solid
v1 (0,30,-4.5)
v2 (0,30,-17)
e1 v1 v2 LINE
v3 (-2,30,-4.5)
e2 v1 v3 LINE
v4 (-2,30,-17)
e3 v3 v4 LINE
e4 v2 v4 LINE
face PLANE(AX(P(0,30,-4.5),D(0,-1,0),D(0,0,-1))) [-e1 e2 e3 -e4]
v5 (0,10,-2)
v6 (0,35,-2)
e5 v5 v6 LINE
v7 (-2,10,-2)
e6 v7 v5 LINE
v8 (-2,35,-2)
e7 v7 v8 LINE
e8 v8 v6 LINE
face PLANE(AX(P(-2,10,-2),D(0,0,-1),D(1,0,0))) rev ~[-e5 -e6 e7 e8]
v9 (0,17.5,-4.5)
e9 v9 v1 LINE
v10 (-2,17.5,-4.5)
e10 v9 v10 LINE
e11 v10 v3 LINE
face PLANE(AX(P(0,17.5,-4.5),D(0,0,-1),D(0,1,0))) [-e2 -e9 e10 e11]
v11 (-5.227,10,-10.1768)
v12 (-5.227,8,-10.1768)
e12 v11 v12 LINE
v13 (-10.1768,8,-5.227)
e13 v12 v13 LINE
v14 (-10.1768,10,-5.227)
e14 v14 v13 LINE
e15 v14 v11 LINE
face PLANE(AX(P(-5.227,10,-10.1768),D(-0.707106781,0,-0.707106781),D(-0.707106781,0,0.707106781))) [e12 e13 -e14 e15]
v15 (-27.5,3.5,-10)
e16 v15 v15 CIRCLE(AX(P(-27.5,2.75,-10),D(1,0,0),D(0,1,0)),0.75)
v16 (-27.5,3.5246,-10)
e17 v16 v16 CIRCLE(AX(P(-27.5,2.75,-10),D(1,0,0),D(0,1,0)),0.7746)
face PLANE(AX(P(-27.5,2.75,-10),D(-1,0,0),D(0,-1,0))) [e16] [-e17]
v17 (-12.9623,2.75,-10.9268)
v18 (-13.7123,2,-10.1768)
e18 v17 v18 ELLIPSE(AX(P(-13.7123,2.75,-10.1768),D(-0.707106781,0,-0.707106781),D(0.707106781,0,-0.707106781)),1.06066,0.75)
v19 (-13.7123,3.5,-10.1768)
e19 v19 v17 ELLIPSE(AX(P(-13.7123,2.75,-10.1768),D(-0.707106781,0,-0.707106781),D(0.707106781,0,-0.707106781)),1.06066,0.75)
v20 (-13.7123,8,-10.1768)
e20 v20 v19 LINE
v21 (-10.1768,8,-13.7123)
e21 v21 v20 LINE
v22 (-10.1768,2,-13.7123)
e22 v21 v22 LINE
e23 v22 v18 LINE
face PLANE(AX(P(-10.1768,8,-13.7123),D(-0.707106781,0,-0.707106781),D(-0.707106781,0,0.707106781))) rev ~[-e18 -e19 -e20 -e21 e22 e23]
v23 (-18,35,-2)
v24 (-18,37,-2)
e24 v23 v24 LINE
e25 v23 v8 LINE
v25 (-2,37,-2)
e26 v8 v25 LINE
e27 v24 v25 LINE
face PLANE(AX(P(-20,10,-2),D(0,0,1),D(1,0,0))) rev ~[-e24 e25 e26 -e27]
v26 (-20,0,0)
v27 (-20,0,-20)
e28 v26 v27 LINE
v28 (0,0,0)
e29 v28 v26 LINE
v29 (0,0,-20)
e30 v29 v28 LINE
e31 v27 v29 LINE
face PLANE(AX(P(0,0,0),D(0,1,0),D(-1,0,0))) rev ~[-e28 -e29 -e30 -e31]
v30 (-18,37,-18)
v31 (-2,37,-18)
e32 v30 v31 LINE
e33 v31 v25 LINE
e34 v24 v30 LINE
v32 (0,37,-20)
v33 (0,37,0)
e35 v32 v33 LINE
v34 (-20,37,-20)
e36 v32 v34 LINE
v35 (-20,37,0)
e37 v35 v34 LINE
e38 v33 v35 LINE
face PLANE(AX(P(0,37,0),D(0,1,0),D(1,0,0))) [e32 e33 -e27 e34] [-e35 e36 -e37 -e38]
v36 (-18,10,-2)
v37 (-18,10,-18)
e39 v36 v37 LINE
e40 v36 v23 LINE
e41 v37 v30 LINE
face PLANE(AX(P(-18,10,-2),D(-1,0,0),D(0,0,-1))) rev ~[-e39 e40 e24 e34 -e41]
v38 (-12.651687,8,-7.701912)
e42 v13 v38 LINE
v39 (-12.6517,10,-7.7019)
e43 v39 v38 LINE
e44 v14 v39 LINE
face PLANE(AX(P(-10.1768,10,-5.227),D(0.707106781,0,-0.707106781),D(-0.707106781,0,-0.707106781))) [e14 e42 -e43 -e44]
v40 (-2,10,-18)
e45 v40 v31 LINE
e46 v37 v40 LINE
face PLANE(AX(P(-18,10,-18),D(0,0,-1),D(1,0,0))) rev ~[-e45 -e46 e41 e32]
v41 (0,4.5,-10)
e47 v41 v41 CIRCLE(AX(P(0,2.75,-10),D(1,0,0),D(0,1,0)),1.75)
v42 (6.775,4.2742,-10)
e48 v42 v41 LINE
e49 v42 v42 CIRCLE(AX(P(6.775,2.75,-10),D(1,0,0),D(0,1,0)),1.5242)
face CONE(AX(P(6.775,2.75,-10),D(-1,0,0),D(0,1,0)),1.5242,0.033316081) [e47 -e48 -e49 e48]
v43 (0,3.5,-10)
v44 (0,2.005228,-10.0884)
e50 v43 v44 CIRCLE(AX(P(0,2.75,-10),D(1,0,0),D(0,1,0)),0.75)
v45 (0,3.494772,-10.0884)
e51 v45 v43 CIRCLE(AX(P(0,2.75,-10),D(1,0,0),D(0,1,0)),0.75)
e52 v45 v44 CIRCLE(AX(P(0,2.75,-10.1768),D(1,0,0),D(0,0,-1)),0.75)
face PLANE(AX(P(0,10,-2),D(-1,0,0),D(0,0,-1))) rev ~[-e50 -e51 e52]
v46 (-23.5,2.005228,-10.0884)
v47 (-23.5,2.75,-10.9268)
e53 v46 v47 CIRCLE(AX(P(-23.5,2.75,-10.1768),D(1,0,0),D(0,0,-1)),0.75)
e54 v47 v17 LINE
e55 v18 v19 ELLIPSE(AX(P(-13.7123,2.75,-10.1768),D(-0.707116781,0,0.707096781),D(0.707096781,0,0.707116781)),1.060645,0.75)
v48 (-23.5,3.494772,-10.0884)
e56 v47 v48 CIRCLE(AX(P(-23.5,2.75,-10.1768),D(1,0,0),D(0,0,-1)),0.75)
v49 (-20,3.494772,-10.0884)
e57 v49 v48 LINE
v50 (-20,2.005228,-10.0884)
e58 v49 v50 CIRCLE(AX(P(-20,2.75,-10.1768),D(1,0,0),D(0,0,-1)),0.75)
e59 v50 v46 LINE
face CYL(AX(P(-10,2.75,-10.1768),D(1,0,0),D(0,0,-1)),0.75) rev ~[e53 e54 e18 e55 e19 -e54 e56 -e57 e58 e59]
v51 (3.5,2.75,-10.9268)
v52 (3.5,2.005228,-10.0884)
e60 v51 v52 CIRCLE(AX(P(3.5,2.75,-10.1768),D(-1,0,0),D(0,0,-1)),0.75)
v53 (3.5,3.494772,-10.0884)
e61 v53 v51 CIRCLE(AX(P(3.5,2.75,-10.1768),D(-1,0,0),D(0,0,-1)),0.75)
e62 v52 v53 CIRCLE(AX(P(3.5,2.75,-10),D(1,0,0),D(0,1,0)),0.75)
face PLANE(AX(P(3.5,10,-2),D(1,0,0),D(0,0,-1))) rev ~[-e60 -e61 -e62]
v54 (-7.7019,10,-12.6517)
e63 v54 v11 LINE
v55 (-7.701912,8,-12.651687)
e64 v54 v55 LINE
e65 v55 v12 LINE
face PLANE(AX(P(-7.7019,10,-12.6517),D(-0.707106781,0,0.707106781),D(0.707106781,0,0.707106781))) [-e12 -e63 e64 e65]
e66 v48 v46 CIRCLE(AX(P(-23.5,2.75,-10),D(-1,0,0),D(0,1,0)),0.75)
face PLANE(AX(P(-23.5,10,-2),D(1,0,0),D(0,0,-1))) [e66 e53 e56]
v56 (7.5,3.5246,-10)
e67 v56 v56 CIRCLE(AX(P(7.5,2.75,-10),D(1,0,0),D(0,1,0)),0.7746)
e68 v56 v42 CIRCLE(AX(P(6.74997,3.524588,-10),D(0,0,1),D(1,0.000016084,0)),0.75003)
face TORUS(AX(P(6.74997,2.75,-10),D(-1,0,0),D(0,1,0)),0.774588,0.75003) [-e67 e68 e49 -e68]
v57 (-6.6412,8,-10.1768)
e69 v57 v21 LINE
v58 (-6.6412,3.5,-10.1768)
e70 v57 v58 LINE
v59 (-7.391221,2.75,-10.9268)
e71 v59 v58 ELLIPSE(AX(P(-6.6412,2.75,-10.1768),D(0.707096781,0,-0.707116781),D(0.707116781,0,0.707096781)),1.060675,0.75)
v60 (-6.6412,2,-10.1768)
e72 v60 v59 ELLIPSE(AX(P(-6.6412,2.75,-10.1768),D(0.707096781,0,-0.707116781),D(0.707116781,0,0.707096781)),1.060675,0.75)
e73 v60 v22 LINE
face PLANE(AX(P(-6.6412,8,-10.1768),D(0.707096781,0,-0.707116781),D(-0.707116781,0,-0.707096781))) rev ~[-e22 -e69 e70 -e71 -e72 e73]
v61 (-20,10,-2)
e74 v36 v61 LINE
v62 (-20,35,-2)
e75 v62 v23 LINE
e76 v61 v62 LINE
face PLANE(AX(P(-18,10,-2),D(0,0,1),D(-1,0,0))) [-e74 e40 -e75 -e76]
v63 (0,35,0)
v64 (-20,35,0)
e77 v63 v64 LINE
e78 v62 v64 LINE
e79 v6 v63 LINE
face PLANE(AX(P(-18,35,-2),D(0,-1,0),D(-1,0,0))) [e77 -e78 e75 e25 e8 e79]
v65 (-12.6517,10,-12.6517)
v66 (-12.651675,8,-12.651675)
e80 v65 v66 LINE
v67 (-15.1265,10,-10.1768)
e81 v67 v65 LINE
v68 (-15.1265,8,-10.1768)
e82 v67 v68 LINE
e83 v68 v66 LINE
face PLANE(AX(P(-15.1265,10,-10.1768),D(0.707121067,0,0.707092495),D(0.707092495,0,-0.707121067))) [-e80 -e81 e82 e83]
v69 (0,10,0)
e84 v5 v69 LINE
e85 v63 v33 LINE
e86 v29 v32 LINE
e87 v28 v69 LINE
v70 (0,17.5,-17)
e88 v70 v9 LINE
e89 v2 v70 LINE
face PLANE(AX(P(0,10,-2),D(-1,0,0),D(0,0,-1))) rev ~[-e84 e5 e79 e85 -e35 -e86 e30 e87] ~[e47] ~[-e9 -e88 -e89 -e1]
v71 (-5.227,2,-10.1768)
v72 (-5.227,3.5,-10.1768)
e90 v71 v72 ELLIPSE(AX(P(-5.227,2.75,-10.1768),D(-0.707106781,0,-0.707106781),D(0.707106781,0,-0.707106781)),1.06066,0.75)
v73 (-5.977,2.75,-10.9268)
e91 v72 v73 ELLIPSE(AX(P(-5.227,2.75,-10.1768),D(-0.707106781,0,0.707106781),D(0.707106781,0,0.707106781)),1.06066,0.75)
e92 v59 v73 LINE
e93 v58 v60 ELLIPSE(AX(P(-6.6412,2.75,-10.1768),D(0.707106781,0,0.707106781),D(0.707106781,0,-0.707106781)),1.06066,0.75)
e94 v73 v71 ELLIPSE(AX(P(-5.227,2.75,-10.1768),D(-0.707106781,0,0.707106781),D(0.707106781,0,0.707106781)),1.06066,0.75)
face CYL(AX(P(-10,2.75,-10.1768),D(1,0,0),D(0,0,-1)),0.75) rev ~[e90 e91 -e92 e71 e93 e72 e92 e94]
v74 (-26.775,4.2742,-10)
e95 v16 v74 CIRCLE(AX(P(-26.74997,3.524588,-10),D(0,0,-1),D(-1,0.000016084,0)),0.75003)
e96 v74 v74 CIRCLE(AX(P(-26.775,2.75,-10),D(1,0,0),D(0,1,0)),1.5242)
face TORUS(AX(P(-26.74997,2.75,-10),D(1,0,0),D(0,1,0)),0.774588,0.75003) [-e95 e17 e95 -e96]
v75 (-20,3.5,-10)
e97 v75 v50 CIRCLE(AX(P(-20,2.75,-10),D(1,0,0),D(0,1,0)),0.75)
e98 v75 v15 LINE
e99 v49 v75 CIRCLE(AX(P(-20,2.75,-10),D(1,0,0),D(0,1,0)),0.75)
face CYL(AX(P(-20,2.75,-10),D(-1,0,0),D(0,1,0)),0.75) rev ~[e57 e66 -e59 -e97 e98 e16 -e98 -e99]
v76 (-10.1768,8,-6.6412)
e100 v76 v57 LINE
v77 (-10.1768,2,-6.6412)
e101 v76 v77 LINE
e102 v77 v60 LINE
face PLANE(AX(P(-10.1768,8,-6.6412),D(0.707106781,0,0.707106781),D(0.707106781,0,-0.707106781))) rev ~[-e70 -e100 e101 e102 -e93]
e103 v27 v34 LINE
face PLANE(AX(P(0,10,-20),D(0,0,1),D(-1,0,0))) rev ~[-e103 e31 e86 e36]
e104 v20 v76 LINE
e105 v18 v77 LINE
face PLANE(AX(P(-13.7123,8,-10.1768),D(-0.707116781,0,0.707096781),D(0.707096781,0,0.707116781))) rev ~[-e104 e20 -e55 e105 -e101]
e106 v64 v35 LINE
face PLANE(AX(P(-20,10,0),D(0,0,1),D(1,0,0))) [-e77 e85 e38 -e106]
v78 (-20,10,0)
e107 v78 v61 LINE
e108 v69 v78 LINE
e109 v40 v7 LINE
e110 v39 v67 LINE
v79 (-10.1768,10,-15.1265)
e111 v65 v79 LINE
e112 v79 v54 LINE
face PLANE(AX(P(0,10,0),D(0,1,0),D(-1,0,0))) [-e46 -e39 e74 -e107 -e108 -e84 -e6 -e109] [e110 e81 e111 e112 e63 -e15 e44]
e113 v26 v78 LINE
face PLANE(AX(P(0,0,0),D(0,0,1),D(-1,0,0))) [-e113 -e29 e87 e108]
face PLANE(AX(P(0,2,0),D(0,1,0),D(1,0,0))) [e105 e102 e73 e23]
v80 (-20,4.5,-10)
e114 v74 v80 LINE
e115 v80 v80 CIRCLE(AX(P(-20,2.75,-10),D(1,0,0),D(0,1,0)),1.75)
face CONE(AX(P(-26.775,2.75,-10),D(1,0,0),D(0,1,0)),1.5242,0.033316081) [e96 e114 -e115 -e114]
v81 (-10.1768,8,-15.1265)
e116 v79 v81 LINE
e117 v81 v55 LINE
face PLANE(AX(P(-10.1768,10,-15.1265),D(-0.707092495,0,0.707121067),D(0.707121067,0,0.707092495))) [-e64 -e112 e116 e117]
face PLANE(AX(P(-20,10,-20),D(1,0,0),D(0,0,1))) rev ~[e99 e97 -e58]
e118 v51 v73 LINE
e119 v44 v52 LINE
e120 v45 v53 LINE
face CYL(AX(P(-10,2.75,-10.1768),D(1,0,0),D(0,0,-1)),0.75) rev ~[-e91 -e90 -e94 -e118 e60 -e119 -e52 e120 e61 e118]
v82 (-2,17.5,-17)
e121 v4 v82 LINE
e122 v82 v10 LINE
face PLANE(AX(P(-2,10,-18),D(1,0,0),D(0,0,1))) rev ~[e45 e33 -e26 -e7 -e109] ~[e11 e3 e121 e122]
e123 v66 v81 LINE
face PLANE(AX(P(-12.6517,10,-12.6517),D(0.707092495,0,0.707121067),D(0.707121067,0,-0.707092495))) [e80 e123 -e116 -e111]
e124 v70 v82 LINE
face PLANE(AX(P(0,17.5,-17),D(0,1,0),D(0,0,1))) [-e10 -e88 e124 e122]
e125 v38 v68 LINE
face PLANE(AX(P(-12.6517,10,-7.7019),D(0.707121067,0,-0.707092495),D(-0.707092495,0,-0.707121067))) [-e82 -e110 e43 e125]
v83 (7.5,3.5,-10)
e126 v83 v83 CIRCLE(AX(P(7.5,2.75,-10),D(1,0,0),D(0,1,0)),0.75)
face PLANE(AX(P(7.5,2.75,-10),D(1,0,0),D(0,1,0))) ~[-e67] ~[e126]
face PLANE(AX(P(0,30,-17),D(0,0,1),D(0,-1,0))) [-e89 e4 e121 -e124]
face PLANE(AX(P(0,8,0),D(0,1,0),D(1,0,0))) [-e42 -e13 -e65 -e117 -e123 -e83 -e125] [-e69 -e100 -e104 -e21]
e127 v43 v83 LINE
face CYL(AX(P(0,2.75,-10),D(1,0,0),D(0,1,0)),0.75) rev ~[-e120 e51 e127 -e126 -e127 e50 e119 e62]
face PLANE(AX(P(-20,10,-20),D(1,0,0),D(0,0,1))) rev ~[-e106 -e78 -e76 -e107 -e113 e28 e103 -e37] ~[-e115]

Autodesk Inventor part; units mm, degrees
ref_plane "YZ Plane" through (0, 0, 0) normal (1, 0, 0) x (0, 1, 0)
sketch "Sketch1" plane through (0, 0, 0) normal (0, 1, 0) x (-1, 0, 0)
  line L0 (0, 0) -> (20, 0)
  line L1 (20, 0) -> (20, -20)
  line L2 (20, -20) -> (0, -20)
  line L3 (0, -20) -> (0, 0)
  dimension "d0" = 20
  dimension "d1" = 20
extrude "Extrusion1" add sketch "Sketch1" along normal blind 10
sketch "Sketch4" plane through (0, 10, 0) normal (0, 1, 0) x (1, 0, 0)
  line L0 (0, 20) -> (-20, 20) projected
  line L1 (-20, 20) -> (-20, 0) projected
  line L2 (-20, 0) -> (0, 0) projected
  line L3 (0, 0) -> (0, 20) projected
  line L4 (0, 20) -> (-20, 20) projected
  line L5 (-20, 20) -> (0, 0)
  line L6 (-10.1768, 10.1768) -> (-7.7019, 12.6517)
  line L7 (-7.7019, 12.6517) -> (-5.227, 10.1768)
  line L8 (-5.227, 10.1768) -> (-7.7019, 7.7019)
  line L9 (-7.7019, 7.7019) -> (-10.1768, 10.1768)
  line L10 (-10.1768, 10.1768) -> (-12.6517, 7.7019)
  line L11 (-12.6517, 7.7019) -> (-15.1265, 10.1768)
  line L12 (-15.1265, 10.1768) -> (-12.6517, 12.6517)
  line L13 (-12.6517, 12.6517) -> (-10.1768, 10.1768)
  line L14 (-12.6517, 12.6517) -> (-10.1768, 15.1265)
  line L15 (-10.1768, 15.1265) -> (-7.7019, 12.6517)
  line L16 (-7.7019, 12.6517) -> (-10.1768, 10.1768)
  line L17 (-10.1768, 10.1768) -> (-12.6517, 12.6517)
  line L18 (-12.6517, 7.7019) -> (-10.1768, 10.1768)
  line L19 (-10.1768, 10.1768) -> (-7.7019, 7.7019)
  line L20 (-7.7019, 7.7019) -> (-10.1768, 5.227)
  line L21 (-10.1768, 5.227) -> (-12.6517, 7.7019)
  dimension "d10" = 3.5
  dimension "d11" = 3.5
  dimension "d12" = 3.5
  dimension "d13" = 3.5
extrude "Extrusion3" cut sketch "Sketch4" against normal blind 8 contours L14 L15 L6 L5 | L5 L10 L11 L12 | L20 L21 L10 L5 | L5 L6 L7 L8
sketch "Sketch5" plane through (0, 10, 0) normal (0, 1, 0) x (1, 0, 0)
  line L0 (-5.227, 10.1768) -> (-10.1768, 5.227) projected
  line L1 (-10.1768, 5.227) -> (-15.1265, 10.1768) projected
  line L2 (-15.1265, 10.1768) -> (-10.1768, 15.1265) projected
  line L3 (-10.1768, 15.1265) -> (-5.227, 10.1768) projected
  line L4 (0, 20) -> (-20, 20) projected
  line L5 (-20, 20) -> (-20, 0) projected
  line L6 (-20, 0) -> (0, 0) projected
  line L7 (0, 0) -> (0, 20) projected
  line L8 (-18, 18) -> (-2, 18)
  line L9 (-2, 18) -> (-2, 2)
  line L10 (-2, 2) -> (-18, 2)
  line L11 (-18, 2) -> (-18, 18)
  line L12 (-18, 2) -> (-18, 0)
  line L13 (-2, 2) -> (-2, 0)
  line L14 (-20, 0) -> (0, 0) projected
  line L15 (-18, 2) -> (-20, 2)
  line L16 (-20, 20) -> (-20, 0) projected
  line L17 (-2, 2) -> (0, 2)
  line L18 (0, 0) -> (0, 20) projected
  point P0 (0, 2)
  dimension "d16" = 2
extrude "Extrusion4" add sketch "Sketch5" along normal blind 27 contours L7 L17 L9 L8 L11 L15 L5 L4
ref_plane "Work Plane1" through (-10, 10, -2) normal (1, 0, 0) x (0, 0, -1)
sketch "Sketch6" plane through (-10, 10, -2) normal (1, 0, 0) x (0, 0, -1)
  line L0 (3.227, 0) -> (8.1768, 0) projected
  line L1 (3.227, 0) -> (3.227, -8) projected
  line L2 (3.227, -8) -> (8.1768, -8) projected
  line L3 (8.1768, 0) -> (8.1768, -8) projected
  line L4 (8.1768, 0) -> (13.1265, 0) projected
  line L5 (8.1768, 0) -> (8.1768, -8) projected
  line L6 (8.1768, -8) -> (13.1265, -8) projected
  line L7 (13.1265, 0) -> (13.1265, -8) projected
  line L8 (16, 0) -> (0, 0) projected
  line L9 (16, 0) -> (16, 27) projected
  line L10 (0, 27) -> (16, 27) projected
  line L11 (0, 0) -> (0, 27) projected
  line L12 (8.1768, 0) -> (8.1768, -8) projected
  line L13 (8.1768, -8) -> (8.1768, -7.25)
  circle A0 centre (8.1768, -7.25) radius 0.75
  point P0 (-2, -10)
  dimension "d20" = 0.75
  dimension "d21" = 1.5
extrude "Extrusion5" cut sketch "Sketch6" along normal mid plane 27 contours A0 L3 | L3 A0
ref_plane "Work Plane2" through (-20, 0, -10) normal (0, 0, 1) x (1, 0, 0)
sketch "Sketch7" plane through (-20, 0, -10) normal (0, 0, 1) x (1, 0, 0)
  line L0 (20, 0) -> (0, 0) projected
  line L1 (0, 0) -> (0, 37) projected
  line L2 (20, 37) -> (0, 37) projected
  line L3 (20, 0) -> (20, 37) projected
  arc A0 (14.773, 3.5) -> (14.773, 2) centre (14.773, 2.75) ccw projected
  arc A1 (14.773, 3.5) -> (14.773, 2) centre (14.773, 2.75) ccw projected
  line L4 (20, 3.5) -> (20, 2) projected
  line L5 (20, 3.5) -> (27.5, 3.5)
  line L6 (27.5, 3.5) -> (27.5, 2)
  line L7 (27.5, 2) -> (20, 2)
  line L8 (20, 2) -> (20, 3.5)
  line L9 (20, 3.5) -> (20, 4.5)
  line L10 (20, 0) -> (20, 37) projected
  line L11 (27.5, 3.5) -> (27.5, 3.5246)
  line L12 (26.775, 4.2742) -> (20, 4.5)
  arc A2 (27.5, 3.5246) -> (26.775, 4.2742) centre (26.75, 3.5246) ccw
  line L13 (20, 3.5) -> (20, 2) projected
  line L14 (20, 2.75) -> (27.5, 2.75)
  point P0 (27.5, 4.25)
  dimension "d25" = 7.5
  dimension "d26" = 1
  dimension "d27" = 0.75
  dimension "d28" = 0.75
revolve "Revolution1" add sketch "Sketch7" angle 360 about axis through (0, 2.75, -10) along (1, 0, 0) contours L3 L12 A2 L11 L5
mirror "Mirror1" about plane through (-10, 10, -2) normal (1, 0, 0) of "Revolution1"
sketch "Sketch8" plane through (-20, 10, -2) normal (0, 0, 1) x (1, 0, 0)
  line L0 (2, 0) -> (0, 0) projected
  line L1 (2, 0) -> (2, 27) projected
  line L2 (0, 27) -> (2, 27) projected
  line L3 (0, 0) -> (0, 27) projected
  line L4 (20, 0) -> (18, 0) projected
  line L5 (20, 0) -> (20, 27) projected
  line L6 (18, 27) -> (20, 27) projected
  line L7 (18, 0) -> (18, 27) projected
  line L8 (20, 27) -> (0, 27) projected
  line L9 (0, 27) -> (20, 27)
  line L10 (20, 27) -> (20, 25)
  line L11 (20, 25) -> (0, 25)
  line L12 (0, 25) -> (0, 27)
  point P0 (20, -10)
  point P1 (0, 25)
  dimension "d30" = 20
  dimension "d31" = 2
extrude "Extrusion6" add sketch "Sketch8" along normal blind 2 contours L11 L3 L2 L1 | L1 L8 L7 L11 | L7 L6 L5 L11
ref_plane "Work Plane3" through (0, 8, 0) normal (0, 1, 0) x (1, 0, 0)
sketch "Sketch9" plane through (0, 8, 0) normal (0, 1, 0) x (1, 0, 0)
  line L0 (-10.1768, 15.1265) -> (-5.227, 10.1768) projected
  line L1 (-15.1265, 10.1768) -> (-10.1768, 15.1265) projected
  line L2 (-10.1768, 5.227) -> (-15.1265, 10.1768) projected
  line L3 (-5.227, 10.1768) -> (-10.1768, 5.227) projected
  line L4 (-6.6412, 10.1768) -> (-10.1768, 13.7123)
  line L5 (-10.1768, 13.7123) -> (-13.7123, 10.1768)
  line L6 (-13.7123, 10.1768) -> (-10.1768, 6.6412)
  line L7 (-10.1768, 6.6412) -> (-6.6412, 10.1768)
  point P0 (0, 0)
  dimension "d35" = 1
extrude "Extrusion7" add sketch "Sketch9" against normal blind 6
extrude "Extrusion8" cut sketch "Sketch6" along normal mid plane 27 contours A0 L3 | L3 A0
sketch "Sketch10" plane through (0, 0, 0) normal (1, 0, 0) x (0, 0, -1)
  line L0 (0, 0) -> (20, 0) projected
  line L1 (20, 0) -> (20, 37) projected
  line L2 (20, 37) -> (0, 37) projected
  line L3 (0, 35) -> (0, 37) projected
  line L4 (2, 35) -> (0, 35) projected
  line L5 (2, 10) -> (2, 35) projected
  line L6 (0, 10) -> (2, 10) projected
  line L7 (0, 0) -> (0, 10) projected
  circle A0 centre (10, 2.75) radius 1.75 projected
  line L8 (2, 35) -> (10, 35)
  line L9 (10, 35) -> (4.5, 35)
  line L10 (4.5, 35) -> (4.5, 30)
  line L11 (4.5, 30) -> (17, 30)
  line L12 (17, 30) -> (17, 17.5)
  line L13 (17, 17.5) -> (4.5, 17.5)
  line L14 (4.5, 17.5) -> (4.5, 30)
  dimension "d40" = 5.5
  dimension "d41" = 5
  dimension "d42" = 12.5
  dimension "d43" = 12.5
  dimension "d44" = 8
extrude "Extrusion9" cut sketch "Sketch10" against normal blind 6 contours L11 L12 L13 L14
properties part number "latticeChamberv4"
